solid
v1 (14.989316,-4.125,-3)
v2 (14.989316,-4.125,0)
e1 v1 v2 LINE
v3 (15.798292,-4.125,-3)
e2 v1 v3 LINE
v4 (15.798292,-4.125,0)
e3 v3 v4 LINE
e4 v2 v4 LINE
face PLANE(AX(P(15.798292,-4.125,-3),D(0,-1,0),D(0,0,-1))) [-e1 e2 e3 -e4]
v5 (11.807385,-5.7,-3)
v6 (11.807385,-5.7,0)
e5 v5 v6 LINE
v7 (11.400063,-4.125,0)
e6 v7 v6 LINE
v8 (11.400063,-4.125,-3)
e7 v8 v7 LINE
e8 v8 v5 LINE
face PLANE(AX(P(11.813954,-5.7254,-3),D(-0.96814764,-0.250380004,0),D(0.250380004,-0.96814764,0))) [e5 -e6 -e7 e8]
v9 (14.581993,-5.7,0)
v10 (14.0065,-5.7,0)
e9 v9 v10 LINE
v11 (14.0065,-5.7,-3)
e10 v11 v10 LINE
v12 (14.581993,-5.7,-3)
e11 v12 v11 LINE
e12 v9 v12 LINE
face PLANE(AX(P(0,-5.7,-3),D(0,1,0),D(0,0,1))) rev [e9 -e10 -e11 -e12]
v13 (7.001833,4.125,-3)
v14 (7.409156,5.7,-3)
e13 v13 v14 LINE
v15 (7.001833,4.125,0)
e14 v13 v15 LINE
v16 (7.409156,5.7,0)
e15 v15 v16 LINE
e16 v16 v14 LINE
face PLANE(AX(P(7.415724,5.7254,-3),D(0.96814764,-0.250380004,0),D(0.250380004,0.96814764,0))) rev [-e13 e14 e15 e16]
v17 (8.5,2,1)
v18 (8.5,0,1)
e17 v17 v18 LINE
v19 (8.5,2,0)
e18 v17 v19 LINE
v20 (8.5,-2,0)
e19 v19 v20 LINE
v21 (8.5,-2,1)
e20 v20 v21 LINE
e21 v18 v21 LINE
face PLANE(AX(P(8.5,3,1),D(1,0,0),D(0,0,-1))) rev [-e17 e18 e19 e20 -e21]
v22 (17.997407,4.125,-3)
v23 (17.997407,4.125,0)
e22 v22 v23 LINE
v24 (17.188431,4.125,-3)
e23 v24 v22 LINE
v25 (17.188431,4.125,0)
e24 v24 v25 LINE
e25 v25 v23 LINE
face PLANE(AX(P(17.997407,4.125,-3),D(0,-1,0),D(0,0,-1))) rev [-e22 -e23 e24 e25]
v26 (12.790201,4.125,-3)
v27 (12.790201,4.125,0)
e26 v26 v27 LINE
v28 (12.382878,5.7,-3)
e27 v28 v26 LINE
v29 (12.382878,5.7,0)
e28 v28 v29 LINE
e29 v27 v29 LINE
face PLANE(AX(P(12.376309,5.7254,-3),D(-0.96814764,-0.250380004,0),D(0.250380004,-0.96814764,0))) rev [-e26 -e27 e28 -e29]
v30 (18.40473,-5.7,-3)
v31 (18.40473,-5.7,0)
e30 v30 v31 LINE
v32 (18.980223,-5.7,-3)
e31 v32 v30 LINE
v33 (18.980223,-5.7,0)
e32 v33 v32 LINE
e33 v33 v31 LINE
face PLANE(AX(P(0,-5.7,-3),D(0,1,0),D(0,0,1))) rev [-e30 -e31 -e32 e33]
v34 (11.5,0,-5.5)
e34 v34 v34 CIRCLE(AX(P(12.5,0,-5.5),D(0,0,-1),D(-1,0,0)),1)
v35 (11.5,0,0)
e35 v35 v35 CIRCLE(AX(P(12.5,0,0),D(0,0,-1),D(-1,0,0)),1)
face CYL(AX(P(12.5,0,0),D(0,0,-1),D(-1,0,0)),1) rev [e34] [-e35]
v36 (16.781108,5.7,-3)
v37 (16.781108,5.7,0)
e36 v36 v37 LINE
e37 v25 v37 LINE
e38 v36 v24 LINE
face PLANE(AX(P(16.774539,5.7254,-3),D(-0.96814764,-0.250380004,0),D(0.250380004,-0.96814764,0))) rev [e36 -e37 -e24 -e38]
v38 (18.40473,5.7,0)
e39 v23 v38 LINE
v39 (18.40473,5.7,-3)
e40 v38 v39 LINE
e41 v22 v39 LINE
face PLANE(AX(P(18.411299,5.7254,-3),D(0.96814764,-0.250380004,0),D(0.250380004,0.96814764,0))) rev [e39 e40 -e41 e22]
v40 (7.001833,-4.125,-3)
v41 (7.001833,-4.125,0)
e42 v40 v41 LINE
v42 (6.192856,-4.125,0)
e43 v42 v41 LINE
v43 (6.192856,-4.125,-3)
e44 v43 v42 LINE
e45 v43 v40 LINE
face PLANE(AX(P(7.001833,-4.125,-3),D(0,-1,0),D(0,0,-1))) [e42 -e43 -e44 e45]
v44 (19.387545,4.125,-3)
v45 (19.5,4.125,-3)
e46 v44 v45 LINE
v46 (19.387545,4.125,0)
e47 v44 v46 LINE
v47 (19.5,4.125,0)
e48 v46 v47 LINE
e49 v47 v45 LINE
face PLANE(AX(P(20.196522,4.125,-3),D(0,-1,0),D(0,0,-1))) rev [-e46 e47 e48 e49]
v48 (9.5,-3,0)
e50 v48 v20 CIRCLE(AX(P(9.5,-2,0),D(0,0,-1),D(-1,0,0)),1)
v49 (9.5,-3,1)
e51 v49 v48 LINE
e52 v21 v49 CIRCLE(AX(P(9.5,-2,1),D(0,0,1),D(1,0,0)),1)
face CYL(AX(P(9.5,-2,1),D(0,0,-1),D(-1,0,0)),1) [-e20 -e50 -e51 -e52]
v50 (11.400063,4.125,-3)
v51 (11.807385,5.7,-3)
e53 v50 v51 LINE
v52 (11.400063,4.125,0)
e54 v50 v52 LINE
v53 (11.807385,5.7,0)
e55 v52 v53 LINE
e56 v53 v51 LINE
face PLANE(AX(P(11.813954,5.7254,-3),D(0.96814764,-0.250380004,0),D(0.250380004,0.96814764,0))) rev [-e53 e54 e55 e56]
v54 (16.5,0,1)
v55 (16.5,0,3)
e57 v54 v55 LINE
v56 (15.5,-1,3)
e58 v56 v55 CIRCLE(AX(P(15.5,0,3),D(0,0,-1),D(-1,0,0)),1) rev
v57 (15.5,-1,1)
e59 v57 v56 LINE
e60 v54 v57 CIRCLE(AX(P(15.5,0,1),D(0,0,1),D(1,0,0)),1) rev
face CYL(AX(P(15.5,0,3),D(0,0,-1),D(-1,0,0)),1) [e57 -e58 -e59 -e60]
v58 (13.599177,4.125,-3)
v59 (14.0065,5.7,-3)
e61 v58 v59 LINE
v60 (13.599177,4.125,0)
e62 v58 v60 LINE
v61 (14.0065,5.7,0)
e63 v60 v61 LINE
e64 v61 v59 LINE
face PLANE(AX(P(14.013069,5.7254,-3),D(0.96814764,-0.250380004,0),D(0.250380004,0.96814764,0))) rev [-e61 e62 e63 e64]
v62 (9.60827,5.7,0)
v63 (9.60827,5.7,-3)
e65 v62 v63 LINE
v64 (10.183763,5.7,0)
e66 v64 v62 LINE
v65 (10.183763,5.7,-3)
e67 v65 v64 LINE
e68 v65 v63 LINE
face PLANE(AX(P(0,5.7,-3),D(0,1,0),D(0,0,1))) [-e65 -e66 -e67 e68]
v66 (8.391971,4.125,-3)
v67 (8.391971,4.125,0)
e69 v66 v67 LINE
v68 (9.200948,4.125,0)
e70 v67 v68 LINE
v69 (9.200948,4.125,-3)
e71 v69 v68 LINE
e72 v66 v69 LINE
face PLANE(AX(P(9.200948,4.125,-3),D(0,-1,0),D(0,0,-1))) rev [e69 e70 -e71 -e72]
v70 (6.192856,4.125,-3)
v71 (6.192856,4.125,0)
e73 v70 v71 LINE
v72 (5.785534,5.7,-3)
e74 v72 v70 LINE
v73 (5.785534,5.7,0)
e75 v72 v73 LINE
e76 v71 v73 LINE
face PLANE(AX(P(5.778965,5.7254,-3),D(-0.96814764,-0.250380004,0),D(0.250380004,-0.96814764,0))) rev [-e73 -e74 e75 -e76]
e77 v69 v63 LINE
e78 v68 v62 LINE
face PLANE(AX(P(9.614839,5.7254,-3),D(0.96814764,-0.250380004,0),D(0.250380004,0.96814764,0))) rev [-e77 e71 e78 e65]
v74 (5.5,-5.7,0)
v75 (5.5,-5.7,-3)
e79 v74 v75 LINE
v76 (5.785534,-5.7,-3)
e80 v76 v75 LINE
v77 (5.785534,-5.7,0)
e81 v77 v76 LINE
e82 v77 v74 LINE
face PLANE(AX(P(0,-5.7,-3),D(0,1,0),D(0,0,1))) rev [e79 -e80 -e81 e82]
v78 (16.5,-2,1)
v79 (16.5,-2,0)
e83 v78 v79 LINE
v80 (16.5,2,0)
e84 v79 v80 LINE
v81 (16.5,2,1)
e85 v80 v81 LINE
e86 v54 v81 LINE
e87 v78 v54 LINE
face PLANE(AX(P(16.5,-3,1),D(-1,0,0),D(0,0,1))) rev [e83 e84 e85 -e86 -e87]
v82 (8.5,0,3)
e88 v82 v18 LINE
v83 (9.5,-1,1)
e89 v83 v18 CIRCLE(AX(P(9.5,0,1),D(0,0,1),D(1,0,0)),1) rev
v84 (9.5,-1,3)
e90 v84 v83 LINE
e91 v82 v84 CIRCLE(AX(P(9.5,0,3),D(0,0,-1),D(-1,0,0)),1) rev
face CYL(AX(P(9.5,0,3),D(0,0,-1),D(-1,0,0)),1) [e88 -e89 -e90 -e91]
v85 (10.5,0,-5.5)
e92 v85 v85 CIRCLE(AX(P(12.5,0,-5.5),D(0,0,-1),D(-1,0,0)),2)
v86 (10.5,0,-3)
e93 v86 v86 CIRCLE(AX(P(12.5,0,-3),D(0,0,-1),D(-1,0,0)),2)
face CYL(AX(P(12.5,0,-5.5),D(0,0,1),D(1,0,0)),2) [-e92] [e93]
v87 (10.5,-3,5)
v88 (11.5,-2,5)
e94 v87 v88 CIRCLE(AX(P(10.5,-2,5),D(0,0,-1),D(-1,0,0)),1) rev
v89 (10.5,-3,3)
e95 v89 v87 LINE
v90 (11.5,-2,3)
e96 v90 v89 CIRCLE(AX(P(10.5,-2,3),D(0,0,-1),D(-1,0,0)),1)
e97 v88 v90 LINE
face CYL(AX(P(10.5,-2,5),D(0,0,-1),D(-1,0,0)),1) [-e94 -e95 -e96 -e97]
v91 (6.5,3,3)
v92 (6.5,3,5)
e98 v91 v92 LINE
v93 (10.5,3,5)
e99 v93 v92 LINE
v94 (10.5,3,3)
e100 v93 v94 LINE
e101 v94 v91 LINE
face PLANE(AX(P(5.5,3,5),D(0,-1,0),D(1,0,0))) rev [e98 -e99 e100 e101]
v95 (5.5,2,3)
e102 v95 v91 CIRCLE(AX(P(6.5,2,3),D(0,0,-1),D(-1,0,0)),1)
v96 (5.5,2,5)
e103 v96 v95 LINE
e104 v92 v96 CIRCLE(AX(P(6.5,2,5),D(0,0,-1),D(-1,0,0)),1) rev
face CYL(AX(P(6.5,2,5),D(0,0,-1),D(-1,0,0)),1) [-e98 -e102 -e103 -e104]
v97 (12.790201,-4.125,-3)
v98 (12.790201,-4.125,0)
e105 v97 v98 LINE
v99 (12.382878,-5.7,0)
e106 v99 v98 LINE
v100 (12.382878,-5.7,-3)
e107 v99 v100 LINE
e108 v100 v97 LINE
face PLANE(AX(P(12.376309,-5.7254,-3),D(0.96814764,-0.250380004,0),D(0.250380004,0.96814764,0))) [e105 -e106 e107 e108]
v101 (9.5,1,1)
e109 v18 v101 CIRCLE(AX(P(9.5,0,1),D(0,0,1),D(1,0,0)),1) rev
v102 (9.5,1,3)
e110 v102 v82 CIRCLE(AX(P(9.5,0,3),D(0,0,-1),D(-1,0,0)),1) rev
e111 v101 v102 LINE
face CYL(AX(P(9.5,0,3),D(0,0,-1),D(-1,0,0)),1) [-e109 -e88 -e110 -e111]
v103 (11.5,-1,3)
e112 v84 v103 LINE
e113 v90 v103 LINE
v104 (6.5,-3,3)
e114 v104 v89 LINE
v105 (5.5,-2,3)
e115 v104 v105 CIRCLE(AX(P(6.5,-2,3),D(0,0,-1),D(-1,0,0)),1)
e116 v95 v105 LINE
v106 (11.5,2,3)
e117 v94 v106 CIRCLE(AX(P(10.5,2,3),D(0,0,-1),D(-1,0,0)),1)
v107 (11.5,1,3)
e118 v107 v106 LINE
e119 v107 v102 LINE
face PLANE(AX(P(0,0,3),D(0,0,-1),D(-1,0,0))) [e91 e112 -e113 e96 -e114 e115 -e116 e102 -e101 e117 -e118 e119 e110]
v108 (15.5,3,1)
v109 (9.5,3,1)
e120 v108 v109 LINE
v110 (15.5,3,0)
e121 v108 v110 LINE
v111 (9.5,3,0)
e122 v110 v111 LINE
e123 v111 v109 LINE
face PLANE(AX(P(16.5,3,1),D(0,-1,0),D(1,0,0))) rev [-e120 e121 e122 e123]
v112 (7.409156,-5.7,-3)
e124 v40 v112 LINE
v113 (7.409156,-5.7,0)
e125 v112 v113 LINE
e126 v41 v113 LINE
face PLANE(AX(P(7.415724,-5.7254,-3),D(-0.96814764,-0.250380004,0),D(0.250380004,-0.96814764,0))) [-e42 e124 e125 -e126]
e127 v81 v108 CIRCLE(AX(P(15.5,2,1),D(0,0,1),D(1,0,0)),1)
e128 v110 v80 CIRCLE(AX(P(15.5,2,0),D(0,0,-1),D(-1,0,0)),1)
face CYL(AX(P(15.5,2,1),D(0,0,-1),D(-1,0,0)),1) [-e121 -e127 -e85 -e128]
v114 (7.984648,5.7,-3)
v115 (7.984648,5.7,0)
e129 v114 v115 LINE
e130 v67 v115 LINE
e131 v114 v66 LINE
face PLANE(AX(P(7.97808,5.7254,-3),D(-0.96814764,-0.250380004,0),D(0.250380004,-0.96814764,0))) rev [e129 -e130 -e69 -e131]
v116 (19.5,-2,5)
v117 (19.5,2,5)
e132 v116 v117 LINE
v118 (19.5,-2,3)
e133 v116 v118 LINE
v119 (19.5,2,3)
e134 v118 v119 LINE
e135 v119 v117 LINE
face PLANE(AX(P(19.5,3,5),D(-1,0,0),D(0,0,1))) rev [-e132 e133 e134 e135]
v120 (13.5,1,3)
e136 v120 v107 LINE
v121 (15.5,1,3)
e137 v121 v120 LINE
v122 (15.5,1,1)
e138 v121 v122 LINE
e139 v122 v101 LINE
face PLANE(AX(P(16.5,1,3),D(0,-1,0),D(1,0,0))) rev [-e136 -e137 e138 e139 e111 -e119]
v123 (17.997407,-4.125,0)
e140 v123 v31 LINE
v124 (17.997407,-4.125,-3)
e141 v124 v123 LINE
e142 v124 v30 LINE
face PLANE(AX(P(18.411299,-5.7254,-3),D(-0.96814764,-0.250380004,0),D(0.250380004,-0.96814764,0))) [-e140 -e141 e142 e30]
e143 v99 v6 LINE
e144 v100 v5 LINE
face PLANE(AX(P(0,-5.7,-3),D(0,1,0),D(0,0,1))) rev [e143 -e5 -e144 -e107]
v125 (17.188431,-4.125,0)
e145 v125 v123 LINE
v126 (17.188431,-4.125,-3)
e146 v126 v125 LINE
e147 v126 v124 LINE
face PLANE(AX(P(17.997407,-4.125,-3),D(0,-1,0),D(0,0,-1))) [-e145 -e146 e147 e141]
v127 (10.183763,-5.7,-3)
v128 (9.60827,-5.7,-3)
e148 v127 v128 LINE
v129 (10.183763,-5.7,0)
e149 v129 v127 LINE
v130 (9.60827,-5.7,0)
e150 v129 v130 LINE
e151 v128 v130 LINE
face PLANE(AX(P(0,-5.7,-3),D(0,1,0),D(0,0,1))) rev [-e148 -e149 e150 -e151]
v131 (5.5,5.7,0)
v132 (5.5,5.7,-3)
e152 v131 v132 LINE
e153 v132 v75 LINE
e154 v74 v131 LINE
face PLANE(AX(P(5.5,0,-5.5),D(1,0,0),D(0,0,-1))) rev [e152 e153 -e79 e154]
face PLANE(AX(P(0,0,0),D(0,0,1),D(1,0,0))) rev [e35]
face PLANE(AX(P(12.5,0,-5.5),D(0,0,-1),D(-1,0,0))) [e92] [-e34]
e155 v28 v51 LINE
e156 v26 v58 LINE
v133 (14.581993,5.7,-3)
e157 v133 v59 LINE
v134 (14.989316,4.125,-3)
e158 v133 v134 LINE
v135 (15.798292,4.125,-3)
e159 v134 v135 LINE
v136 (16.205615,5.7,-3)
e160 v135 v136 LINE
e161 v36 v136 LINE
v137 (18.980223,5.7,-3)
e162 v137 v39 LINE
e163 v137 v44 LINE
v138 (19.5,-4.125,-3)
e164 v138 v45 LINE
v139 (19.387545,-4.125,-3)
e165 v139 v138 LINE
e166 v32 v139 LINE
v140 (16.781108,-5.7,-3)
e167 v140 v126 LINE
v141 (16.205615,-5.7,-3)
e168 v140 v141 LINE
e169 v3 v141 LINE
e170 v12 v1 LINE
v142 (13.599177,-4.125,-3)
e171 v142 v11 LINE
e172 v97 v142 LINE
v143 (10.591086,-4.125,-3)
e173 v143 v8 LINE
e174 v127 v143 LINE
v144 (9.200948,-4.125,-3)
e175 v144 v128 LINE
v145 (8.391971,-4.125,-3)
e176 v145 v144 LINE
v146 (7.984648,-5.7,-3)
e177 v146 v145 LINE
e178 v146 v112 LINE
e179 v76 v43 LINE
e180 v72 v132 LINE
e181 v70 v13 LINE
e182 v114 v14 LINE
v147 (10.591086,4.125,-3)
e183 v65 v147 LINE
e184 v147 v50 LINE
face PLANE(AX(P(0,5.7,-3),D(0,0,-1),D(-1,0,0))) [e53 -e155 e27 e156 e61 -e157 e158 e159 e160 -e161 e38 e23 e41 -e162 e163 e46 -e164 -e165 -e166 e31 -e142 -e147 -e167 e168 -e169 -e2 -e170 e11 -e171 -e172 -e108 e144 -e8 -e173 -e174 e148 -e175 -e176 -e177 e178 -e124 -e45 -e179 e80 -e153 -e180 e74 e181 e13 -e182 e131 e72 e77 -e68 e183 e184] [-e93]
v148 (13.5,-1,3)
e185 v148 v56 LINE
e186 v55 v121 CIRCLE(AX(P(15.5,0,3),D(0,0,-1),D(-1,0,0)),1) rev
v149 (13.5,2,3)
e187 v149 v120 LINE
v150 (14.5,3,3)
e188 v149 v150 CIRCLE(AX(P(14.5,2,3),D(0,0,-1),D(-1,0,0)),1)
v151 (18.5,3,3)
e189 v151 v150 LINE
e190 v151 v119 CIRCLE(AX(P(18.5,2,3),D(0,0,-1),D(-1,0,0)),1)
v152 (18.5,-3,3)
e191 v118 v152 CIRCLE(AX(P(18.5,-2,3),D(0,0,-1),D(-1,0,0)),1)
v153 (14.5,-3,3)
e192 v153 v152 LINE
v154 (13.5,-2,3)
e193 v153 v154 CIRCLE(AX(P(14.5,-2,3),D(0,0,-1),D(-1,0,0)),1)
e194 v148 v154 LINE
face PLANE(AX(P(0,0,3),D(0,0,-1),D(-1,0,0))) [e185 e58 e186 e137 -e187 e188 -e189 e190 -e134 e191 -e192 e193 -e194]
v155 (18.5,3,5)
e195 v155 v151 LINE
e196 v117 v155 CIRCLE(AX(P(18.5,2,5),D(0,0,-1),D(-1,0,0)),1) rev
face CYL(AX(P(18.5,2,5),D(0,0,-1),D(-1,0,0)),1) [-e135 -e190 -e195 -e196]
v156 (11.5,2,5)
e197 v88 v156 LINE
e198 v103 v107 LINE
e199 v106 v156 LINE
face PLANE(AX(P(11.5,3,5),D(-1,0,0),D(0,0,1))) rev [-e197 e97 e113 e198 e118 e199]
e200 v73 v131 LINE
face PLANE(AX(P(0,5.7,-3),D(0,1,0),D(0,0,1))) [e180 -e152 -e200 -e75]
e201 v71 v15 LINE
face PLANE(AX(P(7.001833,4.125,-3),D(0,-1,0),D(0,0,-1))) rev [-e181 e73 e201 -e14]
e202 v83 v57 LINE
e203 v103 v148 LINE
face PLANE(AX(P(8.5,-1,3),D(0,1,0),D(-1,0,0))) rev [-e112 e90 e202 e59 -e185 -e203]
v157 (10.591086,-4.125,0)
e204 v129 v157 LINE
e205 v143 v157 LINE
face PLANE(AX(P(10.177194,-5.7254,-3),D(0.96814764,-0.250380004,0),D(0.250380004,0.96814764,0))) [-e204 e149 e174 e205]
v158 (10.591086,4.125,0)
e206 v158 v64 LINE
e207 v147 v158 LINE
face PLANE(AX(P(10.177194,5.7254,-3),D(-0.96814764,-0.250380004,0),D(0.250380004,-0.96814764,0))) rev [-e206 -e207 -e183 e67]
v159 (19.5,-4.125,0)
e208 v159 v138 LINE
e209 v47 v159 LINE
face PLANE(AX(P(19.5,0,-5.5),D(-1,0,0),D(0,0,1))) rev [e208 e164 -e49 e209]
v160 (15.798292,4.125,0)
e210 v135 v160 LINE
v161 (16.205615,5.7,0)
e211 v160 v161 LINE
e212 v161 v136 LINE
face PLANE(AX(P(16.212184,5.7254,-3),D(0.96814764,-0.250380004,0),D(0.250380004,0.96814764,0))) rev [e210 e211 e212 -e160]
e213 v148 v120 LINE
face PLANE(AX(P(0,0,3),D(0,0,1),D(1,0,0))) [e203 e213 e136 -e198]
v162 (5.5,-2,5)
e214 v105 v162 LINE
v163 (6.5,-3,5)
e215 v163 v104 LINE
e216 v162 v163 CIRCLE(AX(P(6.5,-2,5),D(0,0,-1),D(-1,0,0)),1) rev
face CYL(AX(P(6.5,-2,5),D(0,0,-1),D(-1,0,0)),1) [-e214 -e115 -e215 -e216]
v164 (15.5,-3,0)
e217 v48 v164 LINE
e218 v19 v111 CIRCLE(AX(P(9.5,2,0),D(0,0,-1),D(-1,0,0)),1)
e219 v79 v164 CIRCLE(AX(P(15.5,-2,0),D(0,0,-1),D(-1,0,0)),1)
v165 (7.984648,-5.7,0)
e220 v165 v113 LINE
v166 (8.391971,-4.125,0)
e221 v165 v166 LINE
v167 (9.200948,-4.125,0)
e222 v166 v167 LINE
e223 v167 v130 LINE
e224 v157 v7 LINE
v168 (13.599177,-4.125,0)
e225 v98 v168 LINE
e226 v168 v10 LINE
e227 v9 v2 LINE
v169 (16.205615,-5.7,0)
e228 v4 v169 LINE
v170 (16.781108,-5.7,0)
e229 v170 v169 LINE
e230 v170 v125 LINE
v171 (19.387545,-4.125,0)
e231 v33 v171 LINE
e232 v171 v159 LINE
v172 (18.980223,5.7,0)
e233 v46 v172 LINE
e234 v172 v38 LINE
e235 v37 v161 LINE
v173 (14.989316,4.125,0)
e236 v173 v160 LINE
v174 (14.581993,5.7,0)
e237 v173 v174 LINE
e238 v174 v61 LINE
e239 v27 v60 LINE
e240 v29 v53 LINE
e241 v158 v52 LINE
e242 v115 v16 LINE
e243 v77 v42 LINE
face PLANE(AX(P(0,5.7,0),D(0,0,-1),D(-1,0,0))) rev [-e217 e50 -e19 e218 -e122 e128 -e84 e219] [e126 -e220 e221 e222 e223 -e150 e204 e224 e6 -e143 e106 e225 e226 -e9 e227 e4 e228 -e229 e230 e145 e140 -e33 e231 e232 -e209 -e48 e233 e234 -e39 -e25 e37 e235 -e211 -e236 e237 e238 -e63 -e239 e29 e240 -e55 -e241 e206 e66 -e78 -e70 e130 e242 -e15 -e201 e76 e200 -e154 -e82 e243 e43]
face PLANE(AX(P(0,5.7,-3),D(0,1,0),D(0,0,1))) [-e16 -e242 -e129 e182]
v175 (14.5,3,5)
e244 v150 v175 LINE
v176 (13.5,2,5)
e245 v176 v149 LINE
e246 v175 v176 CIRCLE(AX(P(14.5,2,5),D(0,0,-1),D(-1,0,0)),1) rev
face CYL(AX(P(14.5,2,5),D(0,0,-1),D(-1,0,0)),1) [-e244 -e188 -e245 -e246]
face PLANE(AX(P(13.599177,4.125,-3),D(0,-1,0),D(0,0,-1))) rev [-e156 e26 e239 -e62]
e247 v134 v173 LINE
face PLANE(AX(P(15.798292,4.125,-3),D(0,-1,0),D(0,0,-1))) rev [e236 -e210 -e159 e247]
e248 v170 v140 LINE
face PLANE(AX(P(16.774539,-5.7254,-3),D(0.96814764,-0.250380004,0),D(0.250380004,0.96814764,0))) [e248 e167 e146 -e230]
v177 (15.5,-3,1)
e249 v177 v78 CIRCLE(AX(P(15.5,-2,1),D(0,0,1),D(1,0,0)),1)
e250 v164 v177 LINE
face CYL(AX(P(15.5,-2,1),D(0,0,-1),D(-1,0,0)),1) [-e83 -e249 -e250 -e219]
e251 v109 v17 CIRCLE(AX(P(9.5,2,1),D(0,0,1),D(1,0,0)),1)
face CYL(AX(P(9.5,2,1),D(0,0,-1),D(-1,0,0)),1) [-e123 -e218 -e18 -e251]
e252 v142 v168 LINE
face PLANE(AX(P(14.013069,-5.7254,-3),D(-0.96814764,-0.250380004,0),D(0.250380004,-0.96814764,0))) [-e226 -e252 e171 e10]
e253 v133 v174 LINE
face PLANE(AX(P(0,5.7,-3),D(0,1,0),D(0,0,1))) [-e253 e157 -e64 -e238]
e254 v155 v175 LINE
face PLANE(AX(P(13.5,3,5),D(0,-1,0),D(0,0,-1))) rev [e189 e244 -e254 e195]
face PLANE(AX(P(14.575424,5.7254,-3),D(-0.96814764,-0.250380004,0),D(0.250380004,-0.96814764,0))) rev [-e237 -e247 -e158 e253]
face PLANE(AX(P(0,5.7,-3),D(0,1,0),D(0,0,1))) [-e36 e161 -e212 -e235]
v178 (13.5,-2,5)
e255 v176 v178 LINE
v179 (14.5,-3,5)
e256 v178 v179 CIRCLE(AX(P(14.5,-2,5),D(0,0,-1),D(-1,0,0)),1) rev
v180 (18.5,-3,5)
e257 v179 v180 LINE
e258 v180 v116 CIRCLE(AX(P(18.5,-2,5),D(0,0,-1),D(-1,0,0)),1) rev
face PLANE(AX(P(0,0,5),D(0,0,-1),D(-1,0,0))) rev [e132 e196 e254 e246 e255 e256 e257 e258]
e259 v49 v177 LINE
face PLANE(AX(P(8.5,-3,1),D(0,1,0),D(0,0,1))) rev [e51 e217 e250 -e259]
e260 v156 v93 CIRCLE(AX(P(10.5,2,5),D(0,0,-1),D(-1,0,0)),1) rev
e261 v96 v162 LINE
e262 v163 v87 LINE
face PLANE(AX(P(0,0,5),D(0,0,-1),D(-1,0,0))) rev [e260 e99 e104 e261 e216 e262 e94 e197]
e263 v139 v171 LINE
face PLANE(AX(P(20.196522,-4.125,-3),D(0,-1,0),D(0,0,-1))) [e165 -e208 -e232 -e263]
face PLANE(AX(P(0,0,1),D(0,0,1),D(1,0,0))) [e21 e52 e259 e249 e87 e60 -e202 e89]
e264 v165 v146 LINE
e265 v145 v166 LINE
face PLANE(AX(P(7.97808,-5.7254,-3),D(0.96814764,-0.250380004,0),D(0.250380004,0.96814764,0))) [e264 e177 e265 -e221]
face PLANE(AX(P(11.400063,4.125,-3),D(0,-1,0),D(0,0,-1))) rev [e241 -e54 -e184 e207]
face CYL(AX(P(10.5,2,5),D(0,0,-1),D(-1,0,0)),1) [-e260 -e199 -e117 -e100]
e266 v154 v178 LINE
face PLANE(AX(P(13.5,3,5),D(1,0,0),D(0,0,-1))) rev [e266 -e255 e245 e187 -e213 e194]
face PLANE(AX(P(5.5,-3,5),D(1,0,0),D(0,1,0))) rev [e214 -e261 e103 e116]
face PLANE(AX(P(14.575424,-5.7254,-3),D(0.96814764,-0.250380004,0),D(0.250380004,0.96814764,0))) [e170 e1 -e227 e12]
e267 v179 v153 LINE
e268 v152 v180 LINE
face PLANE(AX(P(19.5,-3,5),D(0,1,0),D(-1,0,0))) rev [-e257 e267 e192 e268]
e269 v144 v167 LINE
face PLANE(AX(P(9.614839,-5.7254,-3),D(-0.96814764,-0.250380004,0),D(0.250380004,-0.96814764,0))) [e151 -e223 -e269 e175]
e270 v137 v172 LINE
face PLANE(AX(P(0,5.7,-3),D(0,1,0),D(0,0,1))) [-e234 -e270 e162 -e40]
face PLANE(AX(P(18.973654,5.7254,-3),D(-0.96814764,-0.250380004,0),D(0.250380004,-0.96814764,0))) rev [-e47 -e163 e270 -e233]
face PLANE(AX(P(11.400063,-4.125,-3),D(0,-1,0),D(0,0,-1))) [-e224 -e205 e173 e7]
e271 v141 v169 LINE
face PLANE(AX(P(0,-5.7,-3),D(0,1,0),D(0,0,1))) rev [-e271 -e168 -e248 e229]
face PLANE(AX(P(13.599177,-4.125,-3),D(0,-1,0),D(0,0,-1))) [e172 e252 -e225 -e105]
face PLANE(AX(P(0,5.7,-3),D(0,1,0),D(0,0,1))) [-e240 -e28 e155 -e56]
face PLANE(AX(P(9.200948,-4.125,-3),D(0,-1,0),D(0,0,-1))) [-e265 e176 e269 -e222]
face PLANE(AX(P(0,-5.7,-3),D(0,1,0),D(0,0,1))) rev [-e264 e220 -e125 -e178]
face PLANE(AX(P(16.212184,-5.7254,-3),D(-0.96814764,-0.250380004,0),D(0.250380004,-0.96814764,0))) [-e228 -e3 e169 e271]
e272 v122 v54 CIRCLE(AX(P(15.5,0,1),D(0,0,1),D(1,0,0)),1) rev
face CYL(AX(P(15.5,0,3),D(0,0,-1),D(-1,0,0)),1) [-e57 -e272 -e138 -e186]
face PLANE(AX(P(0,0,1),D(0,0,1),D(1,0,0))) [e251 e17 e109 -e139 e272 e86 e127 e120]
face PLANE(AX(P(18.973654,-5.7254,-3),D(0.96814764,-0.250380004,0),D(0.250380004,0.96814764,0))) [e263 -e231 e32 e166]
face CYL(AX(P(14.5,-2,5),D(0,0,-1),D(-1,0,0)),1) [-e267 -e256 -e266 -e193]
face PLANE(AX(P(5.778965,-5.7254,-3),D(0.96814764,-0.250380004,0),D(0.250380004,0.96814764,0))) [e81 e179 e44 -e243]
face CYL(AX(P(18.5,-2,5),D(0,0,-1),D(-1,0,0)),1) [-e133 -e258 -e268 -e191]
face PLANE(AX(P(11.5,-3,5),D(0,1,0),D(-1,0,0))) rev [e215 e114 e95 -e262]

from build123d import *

# Parameters (mm, degrees)
BLANKSKE_W             = 25
BLANKSKE_H             = 5.7
BLANK_DEPTH            = 3
TOOTHCUTSIM_DEPTH      = 26.816467613
TEETHCUTS_COUNT        = 12
TEETHCUTS_PITCH        = 2.199114855
MIRROR_2_COPY_1_DEPTH  = 26.816467613
MIRROR_2_COPY_2_DEPTH  = 26.816467613
MIRROR_2_COPY_3_DEPTH  = 26.816467613
MIRROR_2_COPY_4_DEPTH  = 26.816467613
MIRROR_2_COPY_5_DEPTH  = 26.816467613
MIRROR_2_COPY_6_DEPTH  = 26.816467613
MIRROR_2_COPY_7_DEPTH  = 26.816467613
MIRROR_2_COPY_8_DEPTH  = 26.816467613
MIRROR_2_COPY_9_DEPTH  = 26.816467613
MIRROR_2_COPY_10_DEPTH = 26.816467613
MIRROR_2_COPY_11_DEPTH = 26.816467613
SKETCH_2_R             = 2
EXTRUDE_1_DEPTH        = 2.5
SKETCH_3_R             = 0.5
CUT_EXTRUDE_3_DEPTH    = 27.224797425
CUT_EXTRUDE_4_DEPTH    = 10
SKETCH_6_W             = 8
SKETCH_6_H             = 2
EXTRUDE_3_DEPTH        = 3
SKETCH_7_W             = 6
SKETCH_7_H             = 6
EXTRUDE_4_DEPTH        = 2
FILLET_1_R             = 1
FILLET_2_R             = 1
SKETCH_8_W             = 8
SKETCH_8_H             = 6
EXTRUDE_5_DEPTH        = 1
FILLET_5_R             = 1
CUT_EXTRUDE_5_DEPTH    = 24.274077912
SKETCH_10_R            = 1
CUT_EXTRUDE_6_DEPTH    = 5.5


with BuildPart() as part:
    # BlankSke → Blank (new body)
    with BuildSketch(Plane.XY):
        with Locations((12.5, 2.85)):
            Rectangle(BLANKSKE_W, BLANKSKE_H)
    blank = extrude(amount=-BLANK_DEPTH)

    # TooCutSkeSim → ToothCutSim (cut, through all)
    with BuildSketch(Plane.XY):
        Polygon((0.404488327, 4.125), (-0.404488327, 4.125), (-0.818379909, 5.7254), (0.818379909, 5.7254), align=None)
    toothcutsim = extrude(amount=-TOOTHCUTSIM_DEPTH, mode=Mode.SUBTRACT)

    # TeethCuts: ToothCutSim ×12
    with Locations(*[(i * TEETHCUTS_PITCH, 0, 0) for i in range(1, TEETHCUTS_COUNT)]):
        add(toothcutsim, mode=Mode.SUBTRACT)

    # 镜向2: Blank, ToothCutSim across plane
    add(blank.mirror(Plane(origin=(0, 0, -3), x_dir=(0, 0, 1), z_dir=(0, -1, 0))))
    add(toothcutsim.mirror(Plane(origin=(0, 0, -3), x_dir=(0, 0, 1), z_dir=(0, -1, 0))), mode=Mode.SUBTRACT)

    # 镜向2 copy 1 sketch → 镜向2 copy 1 (cut, through all)
    with BuildSketch(Plane(origin=(2.199114855, 0, 0), x_dir=(1, 0, 0), z_dir=(0, 0, 1))):
        Polygon((0.404488327, -4.125), (-0.404488327, -4.125), (-0.818379909, -5.7254), (0.818379909, -5.7254), align=None)
    extrude(amount=-MIRROR_2_COPY_1_DEPTH, mode=Mode.SUBTRACT)

    # 镜向2 copy 2 sketch → 镜向2 copy 2 (cut, through all)
    with BuildSketch(Plane(origin=(4.39822971, 0, 0), x_dir=(1, 0, 0), z_dir=(0, 0, 1))):
        Polygon((0.404488327, -4.125), (-0.404488327, -4.125), (-0.818379909, -5.7254), (0.818379909, -5.7254), align=None)
    extrude(amount=-MIRROR_2_COPY_2_DEPTH, mode=Mode.SUBTRACT)

    # 镜向2 copy 3 sketch → 镜向2 copy 3 (cut, through all)
    with BuildSketch(Plane(origin=(6.597344565, 0, 0), x_dir=(1, 0, 0), z_dir=(0, 0, 1))):
        Polygon((0.404488327, -4.125), (-0.404488327, -4.125), (-0.818379909, -5.7254), (0.818379909, -5.7254), align=None)
    extrude(amount=-MIRROR_2_COPY_3_DEPTH, mode=Mode.SUBTRACT)

    # 镜向2 copy 4 sketch → 镜向2 copy 4 (cut, through all)
    with BuildSketch(Plane(origin=(8.79645942, 0, 0), x_dir=(1, 0, 0), z_dir=(0, 0, 1))):
        Polygon((0.404488327, -4.125), (-0.404488327, -4.125), (-0.818379909, -5.7254), (0.818379909, -5.7254), align=None)
    extrude(amount=-MIRROR_2_COPY_4_DEPTH, mode=Mode.SUBTRACT)

    # 镜向2 copy 5 sketch → 镜向2 copy 5 (cut, through all)
    with BuildSketch(Plane(origin=(10.995574275, 0, 0), x_dir=(1, 0, 0), z_dir=(0, 0, 1))):
        Polygon((0.404488327, -4.125), (-0.404488327, -4.125), (-0.818379909, -5.7254), (0.818379909, -5.7254), align=None)
    extrude(amount=-MIRROR_2_COPY_5_DEPTH, mode=Mode.SUBTRACT)

    # 镜向2 copy 6 sketch → 镜向2 copy 6 (cut, through all)
    with BuildSketch(Plane(origin=(13.19468913, 0, 0), x_dir=(1, 0, 0), z_dir=(0, 0, 1))):
        Polygon((0.404488327, -4.125), (-0.404488327, -4.125), (-0.818379909, -5.7254), (0.818379909, -5.7254), align=None)
    extrude(amount=-MIRROR_2_COPY_6_DEPTH, mode=Mode.SUBTRACT)

    # 镜向2 copy 7 sketch → 镜向2 copy 7 (cut, through all)
    with BuildSketch(Plane(origin=(15.393803985, 0, 0), x_dir=(1, 0, 0), z_dir=(0, 0, 1))):
        Polygon((0.404488327, -4.125), (-0.404488327, -4.125), (-0.818379909, -5.7254), (0.818379909, -5.7254), align=None)
    extrude(amount=-MIRROR_2_COPY_7_DEPTH, mode=Mode.SUBTRACT)

    # 镜向2 copy 8 sketch → 镜向2 copy 8 (cut, through all)
    with BuildSketch(Plane(origin=(17.59291884, 0, 0), x_dir=(1, 0, 0), z_dir=(0, 0, 1))):
        Polygon((0.404488327, -4.125), (-0.404488327, -4.125), (-0.818379909, -5.7254), (0.818379909, -5.7254), align=None)
    extrude(amount=-MIRROR_2_COPY_8_DEPTH, mode=Mode.SUBTRACT)

    # 镜向2 copy 9 sketch → 镜向2 copy 9 (cut, through all)
    with BuildSketch(Plane(origin=(19.792033695, 0, 0), x_dir=(1, 0, 0), z_dir=(0, 0, 1))):
        Polygon((0.404488327, -4.125), (-0.404488327, -4.125), (-0.818379909, -5.7254), (0.818379909, -5.7254), align=None)
    extrude(amount=-MIRROR_2_COPY_9_DEPTH, mode=Mode.SUBTRACT)

    # 镜向2 copy 10 sketch → 镜向2 copy 10 (cut, through all)
    with BuildSketch(Plane(origin=(21.99114855, 0, 0), x_dir=(1, 0, 0), z_dir=(0, 0, 1))):
        Polygon((0.404488327, -4.125), (-0.404488327, -4.125), (-0.818379909, -5.7254), (0.818379909, -5.7254), align=None)
    extrude(amount=-MIRROR_2_COPY_10_DEPTH, mode=Mode.SUBTRACT)

    # 镜向2 copy 11 sketch → 镜向2 copy 11 (cut, through all)
    with BuildSketch(Plane(origin=(24.190263405, 0, 0), x_dir=(1, 0, 0), z_dir=(0, 0, 1))):
        Polygon((0.404488327, -4.125), (-0.404488327, -4.125), (-0.818379909, -5.7254), (0.818379909, -5.7254), align=None)
    extrude(amount=-MIRROR_2_COPY_11_DEPTH, mode=Mode.SUBTRACT)

    # 草图2 → 凸台-拉伸1 (add)
    with BuildSketch(Plane(origin=(0, 0, -3), x_dir=(-1, 0, 0), z_dir=(0, 0, -1))):
        with Locations((-12.5, 0)):
            Circle(SKETCH_2_R)
    extrude(amount=EXTRUDE_1_DEPTH)

    # 草图3 → 切除-拉伸3 (cut, through all)
    with BuildSketch(Plane(origin=(0, 0, -5.5), x_dir=(-1, 0, 0), z_dir=(0, 0, -1))):
        with Locations((-12.5, 0)):
            Circle(SKETCH_3_R)
    extrude(amount=-CUT_EXTRUDE_3_DEPTH, mode=Mode.SUBTRACT)

    # 草图4 → 切除-拉伸4 (cut)
    with BuildSketch(Plane(origin=(0, 0, -3), x_dir=(-1, 0, 0), z_dir=(0, 0, -1))):
        Polygon((-21.884759598, 2.149584132), (-21.884759598, -2.149584132), (-21.884759598, -6.579197657), (-25.677355537, -6.579197657), (-25.677355537, 5.959830346), (-21.884759598, 5.959830346), align=None)
        Polygon((-2.5, 4.125), (-2.5, -4.125), (-2.5, -6.073591689), (0, -6.073591689), (0, 6.402235568), (-2.5, 6.402235568), align=None)
    extrude(amount=-CUT_EXTRUDE_4_DEPTH, mode=Mode.SUBTRACT)

    # 草图6 → 凸台-拉伸3 (add)
    with BuildSketch(Plane.XY):
        with Locations((12.5, 0)):
            Rectangle(SKETCH_6_W, SKETCH_6_H)
    extrude(amount=EXTRUDE_3_DEPTH)

    # 草图7 → 凸台-拉伸4 (add)
    with BuildSketch(Plane.XY.offset(3)):
        with Locations((8.5, 0)):
            Rectangle(SKETCH_7_W, SKETCH_7_H)
        with Locations((16.5, 0)):
            Rectangle(SKETCH_7_W, SKETCH_7_H)
    extrude(amount=EXTRUDE_4_DEPTH)

    # 圆角1
    fillet_1_edges = [part.edges().sort_by_distance(p)[0] for p in [
        (16.5, -1, 1.5),
        (8.5, -1, 1.5),
        (16.5, 1, 1.5),
        (8.5, 1, 1.5),
    ]]
    fillet(fillet_1_edges, radius=FILLET_1_R - 0.0001)  # a hair under: the kernel refuses the full size

    # 圆角2
    fillet_2_edges = [part.edges().sort_by_distance(p)[0] for p in [
        (5.5, 3, 4),
        (5.5, -3, 4),
        (11.5, -3, 4),
        (11.5, 3, 4),
        (19.5, 3, 4),
        (13.5, 3, 4),
        (13.5, -3, 4),
        (19.5, -3, 4),
    ]]
    fillet(fillet_2_edges, radius=FILLET_2_R)

    # 草图8 → 凸台-拉伸5 (add)
    with BuildSketch(Plane.XY):
        with Locations((12.5, 0)):
            Rectangle(SKETCH_8_W, SKETCH_8_H)
    extrude(amount=EXTRUDE_5_DEPTH)

    # 圆角5
    fillet_5_edges = [part.edges().sort_by_distance(p)[0] for p in [
        (16.5, -3, 0.5),
        (8.5, 3, 0.5),
        (16.5, 3, 0.5),
        (8.5, -3, 0.5),
    ]]
    fillet(fillet_5_edges, radius=FILLET_5_R)

    # 草图9 → 切除-拉伸5 (cut, through all)
    with BuildSketch(Plane.XY):
        Polygon((5.5, 0), (5.5, -6.223195751), (2.23821655, -6.223195751), (2.23821655, 6.249606369), (5.5, 6.249606369), align=None)
        Polygon((19.5, 0), (19.5, -6.223195751), (22.40634716, -6.223195751), (22.40634716, 6.249606369), (19.5, 6.249606369), align=None)
    extrude(amount=-CUT_EXTRUDE_5_DEPTH, mode=Mode.SUBTRACT)

    # 草图10 → 切除-拉伸6 (cut)
    with BuildSketch(Plane(origin=(0, 0, -5.5), x_dir=(-1, 0, 0), z_dir=(0, 0, -1))):
        with Locations((-12.5, 0)):
            Circle(SKETCH_10_R)
    extrude(amount=-CUT_EXTRUDE_6_DEPTH, mode=Mode.SUBTRACT)


solid = part.part
